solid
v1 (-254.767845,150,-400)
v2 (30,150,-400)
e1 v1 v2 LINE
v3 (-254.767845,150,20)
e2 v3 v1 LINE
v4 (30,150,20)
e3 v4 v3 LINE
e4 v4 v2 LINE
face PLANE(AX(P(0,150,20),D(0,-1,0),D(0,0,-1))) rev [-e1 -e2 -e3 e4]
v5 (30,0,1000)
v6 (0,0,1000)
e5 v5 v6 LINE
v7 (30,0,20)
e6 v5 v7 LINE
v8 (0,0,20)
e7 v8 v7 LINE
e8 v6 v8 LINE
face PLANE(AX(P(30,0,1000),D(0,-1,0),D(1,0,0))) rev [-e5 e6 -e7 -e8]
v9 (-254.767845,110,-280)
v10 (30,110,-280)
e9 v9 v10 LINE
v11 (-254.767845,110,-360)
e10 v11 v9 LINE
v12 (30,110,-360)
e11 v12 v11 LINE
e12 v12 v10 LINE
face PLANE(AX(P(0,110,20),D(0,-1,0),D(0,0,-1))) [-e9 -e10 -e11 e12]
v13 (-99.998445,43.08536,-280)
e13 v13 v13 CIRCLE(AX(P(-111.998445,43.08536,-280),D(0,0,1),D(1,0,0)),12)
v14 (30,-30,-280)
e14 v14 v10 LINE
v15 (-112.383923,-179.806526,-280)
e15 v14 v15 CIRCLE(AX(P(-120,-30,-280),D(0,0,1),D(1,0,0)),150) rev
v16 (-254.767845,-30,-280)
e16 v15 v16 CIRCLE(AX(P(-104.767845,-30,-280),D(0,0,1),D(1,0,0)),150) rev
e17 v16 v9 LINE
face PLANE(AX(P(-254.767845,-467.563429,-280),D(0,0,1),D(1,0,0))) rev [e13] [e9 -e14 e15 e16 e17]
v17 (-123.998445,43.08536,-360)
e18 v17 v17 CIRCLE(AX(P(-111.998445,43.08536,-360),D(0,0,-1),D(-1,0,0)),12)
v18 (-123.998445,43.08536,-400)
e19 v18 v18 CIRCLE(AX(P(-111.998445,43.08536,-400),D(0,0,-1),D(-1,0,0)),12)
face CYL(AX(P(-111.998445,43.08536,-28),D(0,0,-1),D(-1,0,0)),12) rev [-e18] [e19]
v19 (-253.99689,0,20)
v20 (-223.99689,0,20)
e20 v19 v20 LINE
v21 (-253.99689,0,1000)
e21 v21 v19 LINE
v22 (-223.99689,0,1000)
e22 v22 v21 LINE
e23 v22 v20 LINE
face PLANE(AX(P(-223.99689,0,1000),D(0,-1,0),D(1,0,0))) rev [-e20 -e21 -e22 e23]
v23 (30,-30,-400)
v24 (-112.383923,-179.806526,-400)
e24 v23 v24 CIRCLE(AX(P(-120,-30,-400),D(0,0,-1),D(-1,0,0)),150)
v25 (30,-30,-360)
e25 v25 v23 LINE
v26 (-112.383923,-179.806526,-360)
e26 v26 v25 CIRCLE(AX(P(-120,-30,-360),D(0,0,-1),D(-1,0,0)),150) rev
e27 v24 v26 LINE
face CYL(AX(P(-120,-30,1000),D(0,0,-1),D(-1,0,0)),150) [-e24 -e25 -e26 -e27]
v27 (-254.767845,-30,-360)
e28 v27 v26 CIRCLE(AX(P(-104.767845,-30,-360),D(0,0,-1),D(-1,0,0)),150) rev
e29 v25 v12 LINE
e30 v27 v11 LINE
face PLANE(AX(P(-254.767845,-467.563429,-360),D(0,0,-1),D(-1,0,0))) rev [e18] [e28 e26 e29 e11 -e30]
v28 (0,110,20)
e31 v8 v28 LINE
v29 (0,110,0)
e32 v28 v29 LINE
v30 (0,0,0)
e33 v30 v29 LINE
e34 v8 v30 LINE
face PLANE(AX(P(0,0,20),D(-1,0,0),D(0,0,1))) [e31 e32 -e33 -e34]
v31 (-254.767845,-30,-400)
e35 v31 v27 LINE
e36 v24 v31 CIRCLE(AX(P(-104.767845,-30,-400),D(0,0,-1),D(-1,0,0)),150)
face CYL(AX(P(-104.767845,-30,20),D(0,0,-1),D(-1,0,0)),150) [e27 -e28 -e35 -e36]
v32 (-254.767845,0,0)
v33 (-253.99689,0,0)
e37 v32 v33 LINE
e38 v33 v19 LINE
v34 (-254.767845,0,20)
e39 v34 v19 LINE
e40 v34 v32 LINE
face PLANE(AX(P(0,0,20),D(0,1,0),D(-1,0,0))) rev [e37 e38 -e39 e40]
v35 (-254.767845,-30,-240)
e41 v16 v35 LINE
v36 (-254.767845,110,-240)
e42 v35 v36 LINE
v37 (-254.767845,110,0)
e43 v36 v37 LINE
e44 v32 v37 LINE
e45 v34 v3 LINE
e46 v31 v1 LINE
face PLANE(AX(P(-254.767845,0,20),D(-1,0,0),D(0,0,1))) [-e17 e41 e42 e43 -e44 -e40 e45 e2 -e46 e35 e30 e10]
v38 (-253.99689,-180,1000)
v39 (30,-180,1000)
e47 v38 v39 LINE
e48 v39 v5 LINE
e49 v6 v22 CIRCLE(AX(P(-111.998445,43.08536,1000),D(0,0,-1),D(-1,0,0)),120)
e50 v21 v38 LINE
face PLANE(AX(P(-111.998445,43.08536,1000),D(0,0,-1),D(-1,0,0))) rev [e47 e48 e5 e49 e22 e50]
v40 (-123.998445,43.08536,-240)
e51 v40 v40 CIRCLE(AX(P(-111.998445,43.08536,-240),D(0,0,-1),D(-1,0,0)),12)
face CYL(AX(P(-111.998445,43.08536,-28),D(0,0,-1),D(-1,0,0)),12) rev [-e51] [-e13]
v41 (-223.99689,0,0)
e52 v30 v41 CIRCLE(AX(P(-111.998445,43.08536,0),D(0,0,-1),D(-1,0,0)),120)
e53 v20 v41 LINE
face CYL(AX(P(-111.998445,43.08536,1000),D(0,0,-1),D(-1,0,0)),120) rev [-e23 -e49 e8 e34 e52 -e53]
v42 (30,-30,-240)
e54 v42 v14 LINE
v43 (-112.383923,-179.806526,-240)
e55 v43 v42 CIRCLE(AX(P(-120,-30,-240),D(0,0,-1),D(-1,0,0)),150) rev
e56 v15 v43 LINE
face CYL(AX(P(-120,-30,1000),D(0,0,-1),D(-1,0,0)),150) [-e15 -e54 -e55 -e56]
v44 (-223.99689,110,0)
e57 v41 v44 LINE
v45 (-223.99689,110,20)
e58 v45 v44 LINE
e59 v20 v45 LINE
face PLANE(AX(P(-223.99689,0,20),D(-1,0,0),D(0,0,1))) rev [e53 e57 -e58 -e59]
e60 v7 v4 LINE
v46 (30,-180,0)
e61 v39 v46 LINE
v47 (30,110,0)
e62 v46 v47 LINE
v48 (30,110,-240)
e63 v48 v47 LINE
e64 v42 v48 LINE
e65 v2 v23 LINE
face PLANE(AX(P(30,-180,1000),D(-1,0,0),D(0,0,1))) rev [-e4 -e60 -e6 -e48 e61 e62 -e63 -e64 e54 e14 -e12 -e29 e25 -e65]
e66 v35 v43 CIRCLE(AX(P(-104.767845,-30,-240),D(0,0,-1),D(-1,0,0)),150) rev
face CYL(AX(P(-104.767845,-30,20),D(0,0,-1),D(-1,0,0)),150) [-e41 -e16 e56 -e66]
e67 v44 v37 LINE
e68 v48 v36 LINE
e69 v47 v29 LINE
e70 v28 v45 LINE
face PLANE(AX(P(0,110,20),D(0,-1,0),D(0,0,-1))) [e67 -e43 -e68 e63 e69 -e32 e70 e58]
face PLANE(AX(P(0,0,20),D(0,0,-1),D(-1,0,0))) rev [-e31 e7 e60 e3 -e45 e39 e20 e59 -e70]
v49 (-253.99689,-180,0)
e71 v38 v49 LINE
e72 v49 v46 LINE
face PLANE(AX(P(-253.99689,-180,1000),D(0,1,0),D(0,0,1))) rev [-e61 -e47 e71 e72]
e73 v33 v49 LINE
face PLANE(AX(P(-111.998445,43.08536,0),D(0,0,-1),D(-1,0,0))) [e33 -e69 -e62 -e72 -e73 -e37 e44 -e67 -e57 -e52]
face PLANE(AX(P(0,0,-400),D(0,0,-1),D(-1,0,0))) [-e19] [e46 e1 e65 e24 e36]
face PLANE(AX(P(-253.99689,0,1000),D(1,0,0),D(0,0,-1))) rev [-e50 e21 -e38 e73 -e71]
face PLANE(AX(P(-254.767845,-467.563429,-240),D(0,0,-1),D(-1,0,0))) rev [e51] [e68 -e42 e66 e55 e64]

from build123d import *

# Parameters (mm, degrees)
BOSS_EXTRUDE1_DEPTH = 1000
BOSS_EXTRUDE2_DEPTH = 20
SKETCH3_W           = 284.767845469
SKETCH3_H           = 40
BOSS_EXTRUDE4_DEPTH = 400
SKETCH4_W           = 284.767845469
SKETCH4_H           = 40
BOSS_EXTRUDE5_DEPTH = 290
SKETCH7_R           = 12
CUT_EXTRUDE1_DEPTH  = 372
FILLET1_R           = 150


with BuildPart() as part:
    # Sketch1 → Boss-Extrude1 (new body)
    with BuildSketch(Plane.XY):
        with BuildLine():
            Line((-223.996890487, 0), (-253.996890487, 0))
            Line((-253.996890487, 0), (-253.996890487, -180))
            Line((-253.996890487, -180), (30, -180))
            Line((30, -180), (30, 0))
            Line((30, 0), (0, 0))
            ThreePointArc((0, 0), (-111.998445243, -76.914639806), (-223.996890487, 0))
        make_face()
    extrude(amount=BOSS_EXTRUDE1_DEPTH)

    # Sketch2 → Boss-Extrude2 (add)
    with BuildSketch(Plane(origin=(0, 0, 0), x_dir=(-1, 0, 0), z_dir=(0, 0, -1))):
        Polygon((-30, 110), (-30, 0), (0, 0), (0, 110), (223.996890487, 110), (223.996890487, 0), (253.996890487, 0), (254.767845469, 0), (254.767845469, 110), (254.767845469, 150), (223.996890487, 150), (0, 150), (-30, 150), align=None)
    extrude(amount=-BOSS_EXTRUDE2_DEPTH)

    # Sketch3 → Boss-Extrude4 (add)
    with BuildSketch(Plane(origin=(0, 0, 0), x_dir=(-1, 0, 0), z_dir=(0, 0, -1))):
        with Locations((112.383922735, 130)):
            Rectangle(SKETCH3_W, SKETCH3_H)
    extrude(amount=BOSS_EXTRUDE4_DEPTH)

    # Sketch4 → Boss-Extrude5 (add)
    with BuildSketch(Plane.XZ.offset(-110)):
        with Locations((-112.383922735, -380)):
            Rectangle(SKETCH4_W, SKETCH4_H)
        with Locations((-112.383922735, -260)):
            Rectangle(SKETCH4_W, SKETCH4_H)
    extrude(amount=BOSS_EXTRUDE5_DEPTH)

    # Sketch7 → Cut-Extrude1 (cut)
    with BuildSketch(Plane(origin=(0, 0, -400), x_dir=(-1, 0, 0), z_dir=(0, 0, -1))):
        with Locations((111.998445243, 43.085360194)):
            Circle(SKETCH7_R)
    extrude(amount=-CUT_EXTRUDE1_DEPTH, mode=Mode.SUBTRACT)

    # Fillet1
    # the kernel refuses this fillet: 150 mm, written as the material it takes off along each edge
    with BuildSketch(Plane(origin=(-254.767845469, -180, 15), x_dir=(0, 1, 0), z_dir=(0, 0, -1))) as fillet1_piece_1_section:
        with BuildLine():
            CenterArc((FILLET1_R, FILLET1_R), FILLET1_R, 180, 90)
            Line((0, FILLET1_R), (0, 0))
            Line((0, 0), (FILLET1_R, 0))
        make_face()
    fillet1_piece_1 = extrude(amount=790, mode=Mode.PRIVATE)
    fillet1_piece_1 = split(fillet1_piece_1, bisect_by=Plane(origin=(-254.387947187, -110.019667164, -240), z_dir=(0, 0, -1)), keep=Keep.TOP, mode=Mode.PRIVATE)
    add(fillet1_piece_1, mode=Mode.SUBTRACT)
    with BuildSketch(Plane(origin=(30, -180, -775), x_dir=(0, 1, 0), z_dir=(0, 0, 1))) as fillet1_piece_2_section:
        with BuildLine():
            CenterArc((FILLET1_R, FILLET1_R), FILLET1_R, 180, 90)
            Line((0, FILLET1_R), (0, 0))
            Line((0, 0), (FILLET1_R, 0))
        make_face()
    fillet1_piece_2 = extrude(amount=790, mode=Mode.PRIVATE)
    fillet1_piece_2 = split(fillet1_piece_2, bisect_by=Plane(origin=(-3.505190842, -146.494809158, -240), z_dir=(0, 0, -1)), keep=Keep.TOP, mode=Mode.PRIVATE)
    add(fillet1_piece_2, mode=Mode.SUBTRACT)
    with BuildSketch(Plane(origin=(-254.767845469, -180, -655), x_dir=(0, 1, 0), z_dir=(0, 0, 1)), Plane(origin=(30, -180, -240), x_dir=(0, 1, 0), z_dir=(0, 0, -1))) as fillet1_piece_3:
        with BuildLine():
            CenterArc((FILLET1_R, -FILLET1_R), FILLET1_R, 90, 90)
            Line((0, -FILLET1_R), (0, 0))
            Line((0, 0), (FILLET1_R, 0))
        make_face()
    extrude(amount=415, mode=Mode.SUBTRACT)


solid = part.part
